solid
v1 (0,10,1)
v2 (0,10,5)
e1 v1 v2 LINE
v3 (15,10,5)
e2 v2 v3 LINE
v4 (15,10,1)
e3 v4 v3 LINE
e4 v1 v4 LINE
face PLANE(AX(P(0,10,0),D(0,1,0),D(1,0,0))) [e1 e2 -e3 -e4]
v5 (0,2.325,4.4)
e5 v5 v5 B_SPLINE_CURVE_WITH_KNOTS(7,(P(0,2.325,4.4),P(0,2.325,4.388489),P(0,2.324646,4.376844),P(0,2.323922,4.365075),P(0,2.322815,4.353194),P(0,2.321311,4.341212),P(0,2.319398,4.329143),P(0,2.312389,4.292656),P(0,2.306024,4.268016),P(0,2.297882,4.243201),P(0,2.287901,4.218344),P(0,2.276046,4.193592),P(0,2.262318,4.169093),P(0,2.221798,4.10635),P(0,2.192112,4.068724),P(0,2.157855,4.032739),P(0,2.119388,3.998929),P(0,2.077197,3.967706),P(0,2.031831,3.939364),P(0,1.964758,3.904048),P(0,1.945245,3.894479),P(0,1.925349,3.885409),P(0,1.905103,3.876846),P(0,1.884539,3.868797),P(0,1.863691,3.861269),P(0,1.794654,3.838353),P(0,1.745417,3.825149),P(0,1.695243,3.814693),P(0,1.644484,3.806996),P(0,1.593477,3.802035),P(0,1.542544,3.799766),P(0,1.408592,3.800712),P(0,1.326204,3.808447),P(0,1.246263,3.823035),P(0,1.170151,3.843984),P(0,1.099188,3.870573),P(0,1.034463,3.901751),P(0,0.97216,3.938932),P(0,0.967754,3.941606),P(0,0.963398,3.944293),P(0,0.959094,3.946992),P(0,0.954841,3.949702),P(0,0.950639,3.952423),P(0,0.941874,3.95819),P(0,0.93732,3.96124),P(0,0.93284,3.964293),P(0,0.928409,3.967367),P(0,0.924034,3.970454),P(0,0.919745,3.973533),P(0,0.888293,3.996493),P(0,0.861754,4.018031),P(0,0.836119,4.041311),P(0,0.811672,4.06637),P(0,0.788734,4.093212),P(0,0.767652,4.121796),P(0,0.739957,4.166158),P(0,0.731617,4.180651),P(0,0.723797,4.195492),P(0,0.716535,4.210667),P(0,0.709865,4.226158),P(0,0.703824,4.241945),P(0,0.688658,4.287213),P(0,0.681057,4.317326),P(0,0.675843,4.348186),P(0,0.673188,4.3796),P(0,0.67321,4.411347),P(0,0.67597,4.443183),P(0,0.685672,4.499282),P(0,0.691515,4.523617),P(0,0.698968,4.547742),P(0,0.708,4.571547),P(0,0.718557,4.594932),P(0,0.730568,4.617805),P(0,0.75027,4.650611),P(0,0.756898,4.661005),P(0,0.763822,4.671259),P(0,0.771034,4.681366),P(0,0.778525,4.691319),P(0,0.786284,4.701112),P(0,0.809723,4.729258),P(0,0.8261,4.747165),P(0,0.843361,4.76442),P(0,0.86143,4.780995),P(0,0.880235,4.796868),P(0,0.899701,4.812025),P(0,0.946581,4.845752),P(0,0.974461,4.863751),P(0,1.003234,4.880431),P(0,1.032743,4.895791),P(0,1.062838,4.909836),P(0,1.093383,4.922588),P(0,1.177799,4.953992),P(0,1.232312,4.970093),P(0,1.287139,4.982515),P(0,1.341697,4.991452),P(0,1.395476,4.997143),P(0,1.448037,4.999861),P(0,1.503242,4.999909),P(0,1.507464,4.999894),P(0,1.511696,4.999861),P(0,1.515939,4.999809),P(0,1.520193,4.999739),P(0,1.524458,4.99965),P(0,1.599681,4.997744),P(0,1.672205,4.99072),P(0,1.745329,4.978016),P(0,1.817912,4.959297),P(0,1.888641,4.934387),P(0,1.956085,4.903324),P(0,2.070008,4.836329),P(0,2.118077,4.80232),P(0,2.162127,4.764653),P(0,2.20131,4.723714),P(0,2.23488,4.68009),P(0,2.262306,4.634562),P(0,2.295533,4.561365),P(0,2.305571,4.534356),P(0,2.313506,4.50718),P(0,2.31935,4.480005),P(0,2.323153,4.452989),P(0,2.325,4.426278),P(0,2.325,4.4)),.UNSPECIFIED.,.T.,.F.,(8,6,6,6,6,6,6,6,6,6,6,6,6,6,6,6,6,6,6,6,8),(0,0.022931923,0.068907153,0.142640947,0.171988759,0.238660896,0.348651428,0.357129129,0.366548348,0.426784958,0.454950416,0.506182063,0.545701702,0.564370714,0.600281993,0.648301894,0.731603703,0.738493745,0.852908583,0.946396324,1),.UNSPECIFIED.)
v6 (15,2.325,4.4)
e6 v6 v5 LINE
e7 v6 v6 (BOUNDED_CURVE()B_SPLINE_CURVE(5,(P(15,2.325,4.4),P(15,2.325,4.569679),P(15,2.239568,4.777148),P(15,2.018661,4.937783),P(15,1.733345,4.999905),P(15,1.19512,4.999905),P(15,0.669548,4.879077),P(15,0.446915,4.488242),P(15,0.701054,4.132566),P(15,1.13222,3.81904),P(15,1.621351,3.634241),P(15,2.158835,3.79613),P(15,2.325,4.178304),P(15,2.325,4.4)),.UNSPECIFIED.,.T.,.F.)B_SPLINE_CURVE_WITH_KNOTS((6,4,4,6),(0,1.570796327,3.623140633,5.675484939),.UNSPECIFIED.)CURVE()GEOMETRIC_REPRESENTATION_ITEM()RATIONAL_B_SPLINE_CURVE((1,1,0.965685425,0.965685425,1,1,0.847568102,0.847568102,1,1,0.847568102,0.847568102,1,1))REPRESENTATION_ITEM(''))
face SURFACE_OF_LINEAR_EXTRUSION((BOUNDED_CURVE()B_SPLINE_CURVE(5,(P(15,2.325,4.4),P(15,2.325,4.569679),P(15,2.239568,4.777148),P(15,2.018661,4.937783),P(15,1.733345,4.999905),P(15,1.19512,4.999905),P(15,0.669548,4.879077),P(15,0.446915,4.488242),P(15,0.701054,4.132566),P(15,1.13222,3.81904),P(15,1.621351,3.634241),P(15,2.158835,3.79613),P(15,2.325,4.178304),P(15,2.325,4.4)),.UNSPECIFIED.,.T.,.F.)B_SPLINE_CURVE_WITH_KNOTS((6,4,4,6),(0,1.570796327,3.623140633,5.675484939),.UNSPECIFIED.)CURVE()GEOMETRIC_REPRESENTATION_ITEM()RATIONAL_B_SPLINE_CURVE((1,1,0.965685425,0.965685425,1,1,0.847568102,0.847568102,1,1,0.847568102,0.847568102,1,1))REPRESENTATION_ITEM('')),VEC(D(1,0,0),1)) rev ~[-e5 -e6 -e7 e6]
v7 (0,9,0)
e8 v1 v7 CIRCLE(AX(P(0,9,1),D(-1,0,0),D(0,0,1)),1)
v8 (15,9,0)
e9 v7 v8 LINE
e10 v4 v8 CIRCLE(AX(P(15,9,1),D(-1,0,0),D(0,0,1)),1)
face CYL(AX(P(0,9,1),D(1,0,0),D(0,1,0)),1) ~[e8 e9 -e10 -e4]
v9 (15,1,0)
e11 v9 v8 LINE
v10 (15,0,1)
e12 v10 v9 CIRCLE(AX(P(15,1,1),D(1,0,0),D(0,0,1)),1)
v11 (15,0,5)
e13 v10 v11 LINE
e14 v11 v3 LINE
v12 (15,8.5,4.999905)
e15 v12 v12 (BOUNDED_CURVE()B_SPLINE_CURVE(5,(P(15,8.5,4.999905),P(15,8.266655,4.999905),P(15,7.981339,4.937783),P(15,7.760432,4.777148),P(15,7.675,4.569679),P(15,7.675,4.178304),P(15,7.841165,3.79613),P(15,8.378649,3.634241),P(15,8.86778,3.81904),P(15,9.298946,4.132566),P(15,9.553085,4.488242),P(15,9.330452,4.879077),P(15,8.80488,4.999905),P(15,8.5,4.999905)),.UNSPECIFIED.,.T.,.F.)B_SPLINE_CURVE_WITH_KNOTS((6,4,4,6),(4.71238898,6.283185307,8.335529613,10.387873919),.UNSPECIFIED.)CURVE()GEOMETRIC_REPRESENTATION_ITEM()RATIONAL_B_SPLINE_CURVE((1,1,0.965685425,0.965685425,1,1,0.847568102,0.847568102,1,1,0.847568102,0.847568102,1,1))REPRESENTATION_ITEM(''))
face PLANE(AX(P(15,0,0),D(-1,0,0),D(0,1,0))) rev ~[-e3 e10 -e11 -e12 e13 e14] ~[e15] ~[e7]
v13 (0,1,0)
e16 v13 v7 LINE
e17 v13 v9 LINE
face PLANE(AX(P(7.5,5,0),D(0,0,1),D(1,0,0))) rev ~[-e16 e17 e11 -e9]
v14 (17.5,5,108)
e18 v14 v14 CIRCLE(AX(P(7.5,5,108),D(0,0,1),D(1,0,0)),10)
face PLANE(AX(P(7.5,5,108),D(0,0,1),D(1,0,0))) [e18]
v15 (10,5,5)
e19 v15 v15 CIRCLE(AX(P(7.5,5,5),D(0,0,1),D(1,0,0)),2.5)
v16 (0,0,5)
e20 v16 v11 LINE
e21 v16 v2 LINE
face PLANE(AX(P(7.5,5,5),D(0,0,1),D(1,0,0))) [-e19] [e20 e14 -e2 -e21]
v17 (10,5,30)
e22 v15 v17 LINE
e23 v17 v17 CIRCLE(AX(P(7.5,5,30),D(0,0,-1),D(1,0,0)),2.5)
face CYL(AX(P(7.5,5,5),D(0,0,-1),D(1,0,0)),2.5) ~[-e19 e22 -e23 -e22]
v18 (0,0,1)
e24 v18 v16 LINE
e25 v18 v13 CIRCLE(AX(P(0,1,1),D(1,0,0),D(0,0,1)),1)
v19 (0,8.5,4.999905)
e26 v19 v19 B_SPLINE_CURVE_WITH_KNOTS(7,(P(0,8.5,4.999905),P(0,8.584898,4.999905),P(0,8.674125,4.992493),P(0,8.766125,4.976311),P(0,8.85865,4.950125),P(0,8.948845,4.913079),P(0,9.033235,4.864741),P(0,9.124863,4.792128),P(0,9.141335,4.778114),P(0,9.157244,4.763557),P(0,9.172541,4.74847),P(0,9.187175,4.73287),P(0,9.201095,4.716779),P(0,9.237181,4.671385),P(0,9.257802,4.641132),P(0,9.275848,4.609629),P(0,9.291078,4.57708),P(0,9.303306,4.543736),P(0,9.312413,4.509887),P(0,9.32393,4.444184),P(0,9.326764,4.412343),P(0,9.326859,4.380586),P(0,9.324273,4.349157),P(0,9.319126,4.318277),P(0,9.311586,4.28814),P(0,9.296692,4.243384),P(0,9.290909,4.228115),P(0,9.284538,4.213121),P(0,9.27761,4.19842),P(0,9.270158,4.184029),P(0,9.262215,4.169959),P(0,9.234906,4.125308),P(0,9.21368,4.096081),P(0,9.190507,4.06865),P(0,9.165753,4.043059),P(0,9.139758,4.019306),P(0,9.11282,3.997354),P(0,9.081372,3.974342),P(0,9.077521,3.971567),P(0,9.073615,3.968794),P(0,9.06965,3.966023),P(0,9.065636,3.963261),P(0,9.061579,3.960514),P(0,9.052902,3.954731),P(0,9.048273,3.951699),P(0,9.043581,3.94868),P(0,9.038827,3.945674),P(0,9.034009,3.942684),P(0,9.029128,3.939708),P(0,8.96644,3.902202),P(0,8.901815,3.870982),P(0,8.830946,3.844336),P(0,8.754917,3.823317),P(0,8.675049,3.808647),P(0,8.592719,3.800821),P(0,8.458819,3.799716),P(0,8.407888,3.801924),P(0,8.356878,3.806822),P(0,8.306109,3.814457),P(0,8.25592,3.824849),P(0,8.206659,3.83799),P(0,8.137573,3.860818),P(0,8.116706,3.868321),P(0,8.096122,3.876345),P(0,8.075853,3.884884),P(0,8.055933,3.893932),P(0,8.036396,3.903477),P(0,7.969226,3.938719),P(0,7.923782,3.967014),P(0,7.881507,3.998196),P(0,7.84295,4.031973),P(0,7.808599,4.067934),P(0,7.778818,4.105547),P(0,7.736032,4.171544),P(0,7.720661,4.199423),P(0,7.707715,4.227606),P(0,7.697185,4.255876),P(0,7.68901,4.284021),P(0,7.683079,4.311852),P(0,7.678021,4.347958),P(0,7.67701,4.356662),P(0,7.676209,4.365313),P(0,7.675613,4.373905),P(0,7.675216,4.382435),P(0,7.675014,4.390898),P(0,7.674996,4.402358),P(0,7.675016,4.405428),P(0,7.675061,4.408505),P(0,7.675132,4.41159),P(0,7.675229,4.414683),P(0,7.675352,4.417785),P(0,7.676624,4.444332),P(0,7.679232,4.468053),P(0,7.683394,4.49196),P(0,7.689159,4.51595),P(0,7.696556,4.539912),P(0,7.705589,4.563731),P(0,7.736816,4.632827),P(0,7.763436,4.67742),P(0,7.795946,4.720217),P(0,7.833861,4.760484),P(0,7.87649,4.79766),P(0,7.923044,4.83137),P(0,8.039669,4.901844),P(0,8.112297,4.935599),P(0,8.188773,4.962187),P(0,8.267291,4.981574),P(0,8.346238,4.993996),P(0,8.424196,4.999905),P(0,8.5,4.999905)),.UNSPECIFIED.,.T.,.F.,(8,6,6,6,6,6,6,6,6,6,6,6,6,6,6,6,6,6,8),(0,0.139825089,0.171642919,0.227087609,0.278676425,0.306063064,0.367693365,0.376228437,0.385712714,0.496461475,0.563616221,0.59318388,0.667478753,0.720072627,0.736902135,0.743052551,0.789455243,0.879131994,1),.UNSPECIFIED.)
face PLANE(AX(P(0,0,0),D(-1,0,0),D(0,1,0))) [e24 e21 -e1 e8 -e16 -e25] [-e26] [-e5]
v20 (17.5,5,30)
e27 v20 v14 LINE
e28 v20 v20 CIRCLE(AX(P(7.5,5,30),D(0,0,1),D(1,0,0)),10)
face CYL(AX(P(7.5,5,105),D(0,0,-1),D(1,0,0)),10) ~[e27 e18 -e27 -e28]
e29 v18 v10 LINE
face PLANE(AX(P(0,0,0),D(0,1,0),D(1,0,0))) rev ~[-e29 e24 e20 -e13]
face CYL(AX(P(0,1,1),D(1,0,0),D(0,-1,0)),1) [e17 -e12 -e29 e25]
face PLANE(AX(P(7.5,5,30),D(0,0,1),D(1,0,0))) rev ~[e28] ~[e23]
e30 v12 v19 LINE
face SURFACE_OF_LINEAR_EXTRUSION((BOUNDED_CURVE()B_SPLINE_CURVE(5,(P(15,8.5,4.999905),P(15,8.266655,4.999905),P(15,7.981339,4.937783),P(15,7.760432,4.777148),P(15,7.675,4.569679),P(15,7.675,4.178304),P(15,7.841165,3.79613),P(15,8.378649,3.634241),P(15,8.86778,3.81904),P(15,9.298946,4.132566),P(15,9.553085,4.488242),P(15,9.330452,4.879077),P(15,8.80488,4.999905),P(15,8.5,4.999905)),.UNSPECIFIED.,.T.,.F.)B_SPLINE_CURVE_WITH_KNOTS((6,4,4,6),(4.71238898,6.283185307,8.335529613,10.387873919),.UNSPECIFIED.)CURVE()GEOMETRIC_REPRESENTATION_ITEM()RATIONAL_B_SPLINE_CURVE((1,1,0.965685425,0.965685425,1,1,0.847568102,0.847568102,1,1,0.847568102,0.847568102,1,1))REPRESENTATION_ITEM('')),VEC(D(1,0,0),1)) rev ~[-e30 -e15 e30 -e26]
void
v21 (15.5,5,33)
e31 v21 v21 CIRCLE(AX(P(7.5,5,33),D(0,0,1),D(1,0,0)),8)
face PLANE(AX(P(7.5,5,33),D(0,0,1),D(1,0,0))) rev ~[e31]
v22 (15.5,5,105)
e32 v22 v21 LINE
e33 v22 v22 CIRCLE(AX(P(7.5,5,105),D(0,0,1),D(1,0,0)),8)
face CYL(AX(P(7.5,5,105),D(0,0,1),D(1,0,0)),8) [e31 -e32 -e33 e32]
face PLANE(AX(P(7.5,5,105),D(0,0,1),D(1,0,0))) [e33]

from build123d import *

# Parameters (mm, degrees)
F0_W      = 15
F0_H      = 10
F1_DEPTH  = 5
F2_R      = 2.5
F3_DEPTH  = 100
F6_R      = 1
F9_DEPTH  = 15.001
F5_R      = 10
F10_DEPTH = 75
F11_R     = 8
F12_DEPTH = 72
F13_R     = 10
F13_R_2   = 8
F15_DEPTH = 3


with BuildPart() as f1:
    # F0 (on Top) → F1 (new body)
    with BuildSketch(Plane.XY):
        with Locations((7.5, 5)):
            Rectangle(F0_W, F0_H)
    extrude(amount=F1_DEPTH)

    # F2 (on face) → F3 (join)
    with BuildSketch(Plane.XY.offset(5)):
        with Locations((7.5, 5)):
            Circle(F2_R)
    extrude(amount=F3_DEPTH)

    # F6
    f6_edges = [f1.edges().sort_by_distance(p)[0] for p in [
        (7.5, 0, 0),
        (7.5, 10, 0),
    ]]
    fillet(f6_edges, radius=F6_R)

    # F7 (on face) → F9 (cut, through all)
    with BuildSketch(Plane.YZ.offset(15)):
        with BuildLine():
            add(Edge.make_bspline(
                [(1.5, 4.9999053105), (-0.491726189, 4.9999053105), (0.9166369055, 3.9758028869), (2.325, 2.9517004633), (2.325, 4.4)],
                knots=[1.5707963268, 1.5707963268, 1.5707963268, 3.926990817, 3.926990817, 6.2831853072, 6.2831853072, 6.2831853072], degree=2, weights=[1, 0.3826834324, 1, 0.3826834324, 1]))
            add(Edge.make_bspline(
                [(2.325, 4.4), (2.325, 4.9999053105), (1.5, 4.9999053105)],
                knots=[0, 0, 0, 1.5707963268, 1.5707963268, 1.5707963268], degree=2, weights=[1, 0.7071067812, 1]))
        make_face()
        with BuildLine():
            add(Edge.make_bspline(
                [(7.675, 4.4), (7.675, 2.9517004633), (9.0833630945, 3.9758028869), (10.491726189, 4.9999053105), (8.5, 4.9999053105)],
                knots=[0, 0, 0, 2.3561944902, 2.3561944902, 4.7123889804, 4.7123889804, 4.7123889804], degree=2, weights=[1, 0.3826834324, 1, 0.3826834324, 1]))
            add(Edge.make_bspline(
                [(8.5, 4.9999053105), (7.675, 4.9999053105), (7.675, 4.4)],
                knots=[4.7123889804, 4.7123889804, 4.7123889804, 6.2831853072, 6.2831853072, 6.2831853072], degree=2, weights=[1, 0.7071067812, 1]))
        make_face()
    extrude(amount=-F9_DEPTH, mode=Mode.SUBTRACT)

    # F5 (on offset) → F10 (join, through all)
    with BuildSketch(Plane.XY.offset(30)):
        with Locations((7.5, 5)):
            Circle(F5_R)
    extrude(amount=F10_DEPTH)

    # F11 (on face) → F12 (cut)
    with BuildSketch(Plane.XY.offset(105)):
        with Locations((7.5, 5)):
            Circle(F11_R)
    extrude(amount=-F12_DEPTH, mode=Mode.SUBTRACT)

    # F13 (on face) → F15 (join)
    with BuildSketch(Plane.XY.offset(105)):
        with Locations((7.5, 5)):
            Circle(F13_R)
        with Locations((7.5, 5)):
            Circle(F13_R_2, mode=Mode.SUBTRACT)
        with Locations((7.5, 5)):
            Circle(F13_R_2)
    extrude(amount=F15_DEPTH)


solid = f1.part
